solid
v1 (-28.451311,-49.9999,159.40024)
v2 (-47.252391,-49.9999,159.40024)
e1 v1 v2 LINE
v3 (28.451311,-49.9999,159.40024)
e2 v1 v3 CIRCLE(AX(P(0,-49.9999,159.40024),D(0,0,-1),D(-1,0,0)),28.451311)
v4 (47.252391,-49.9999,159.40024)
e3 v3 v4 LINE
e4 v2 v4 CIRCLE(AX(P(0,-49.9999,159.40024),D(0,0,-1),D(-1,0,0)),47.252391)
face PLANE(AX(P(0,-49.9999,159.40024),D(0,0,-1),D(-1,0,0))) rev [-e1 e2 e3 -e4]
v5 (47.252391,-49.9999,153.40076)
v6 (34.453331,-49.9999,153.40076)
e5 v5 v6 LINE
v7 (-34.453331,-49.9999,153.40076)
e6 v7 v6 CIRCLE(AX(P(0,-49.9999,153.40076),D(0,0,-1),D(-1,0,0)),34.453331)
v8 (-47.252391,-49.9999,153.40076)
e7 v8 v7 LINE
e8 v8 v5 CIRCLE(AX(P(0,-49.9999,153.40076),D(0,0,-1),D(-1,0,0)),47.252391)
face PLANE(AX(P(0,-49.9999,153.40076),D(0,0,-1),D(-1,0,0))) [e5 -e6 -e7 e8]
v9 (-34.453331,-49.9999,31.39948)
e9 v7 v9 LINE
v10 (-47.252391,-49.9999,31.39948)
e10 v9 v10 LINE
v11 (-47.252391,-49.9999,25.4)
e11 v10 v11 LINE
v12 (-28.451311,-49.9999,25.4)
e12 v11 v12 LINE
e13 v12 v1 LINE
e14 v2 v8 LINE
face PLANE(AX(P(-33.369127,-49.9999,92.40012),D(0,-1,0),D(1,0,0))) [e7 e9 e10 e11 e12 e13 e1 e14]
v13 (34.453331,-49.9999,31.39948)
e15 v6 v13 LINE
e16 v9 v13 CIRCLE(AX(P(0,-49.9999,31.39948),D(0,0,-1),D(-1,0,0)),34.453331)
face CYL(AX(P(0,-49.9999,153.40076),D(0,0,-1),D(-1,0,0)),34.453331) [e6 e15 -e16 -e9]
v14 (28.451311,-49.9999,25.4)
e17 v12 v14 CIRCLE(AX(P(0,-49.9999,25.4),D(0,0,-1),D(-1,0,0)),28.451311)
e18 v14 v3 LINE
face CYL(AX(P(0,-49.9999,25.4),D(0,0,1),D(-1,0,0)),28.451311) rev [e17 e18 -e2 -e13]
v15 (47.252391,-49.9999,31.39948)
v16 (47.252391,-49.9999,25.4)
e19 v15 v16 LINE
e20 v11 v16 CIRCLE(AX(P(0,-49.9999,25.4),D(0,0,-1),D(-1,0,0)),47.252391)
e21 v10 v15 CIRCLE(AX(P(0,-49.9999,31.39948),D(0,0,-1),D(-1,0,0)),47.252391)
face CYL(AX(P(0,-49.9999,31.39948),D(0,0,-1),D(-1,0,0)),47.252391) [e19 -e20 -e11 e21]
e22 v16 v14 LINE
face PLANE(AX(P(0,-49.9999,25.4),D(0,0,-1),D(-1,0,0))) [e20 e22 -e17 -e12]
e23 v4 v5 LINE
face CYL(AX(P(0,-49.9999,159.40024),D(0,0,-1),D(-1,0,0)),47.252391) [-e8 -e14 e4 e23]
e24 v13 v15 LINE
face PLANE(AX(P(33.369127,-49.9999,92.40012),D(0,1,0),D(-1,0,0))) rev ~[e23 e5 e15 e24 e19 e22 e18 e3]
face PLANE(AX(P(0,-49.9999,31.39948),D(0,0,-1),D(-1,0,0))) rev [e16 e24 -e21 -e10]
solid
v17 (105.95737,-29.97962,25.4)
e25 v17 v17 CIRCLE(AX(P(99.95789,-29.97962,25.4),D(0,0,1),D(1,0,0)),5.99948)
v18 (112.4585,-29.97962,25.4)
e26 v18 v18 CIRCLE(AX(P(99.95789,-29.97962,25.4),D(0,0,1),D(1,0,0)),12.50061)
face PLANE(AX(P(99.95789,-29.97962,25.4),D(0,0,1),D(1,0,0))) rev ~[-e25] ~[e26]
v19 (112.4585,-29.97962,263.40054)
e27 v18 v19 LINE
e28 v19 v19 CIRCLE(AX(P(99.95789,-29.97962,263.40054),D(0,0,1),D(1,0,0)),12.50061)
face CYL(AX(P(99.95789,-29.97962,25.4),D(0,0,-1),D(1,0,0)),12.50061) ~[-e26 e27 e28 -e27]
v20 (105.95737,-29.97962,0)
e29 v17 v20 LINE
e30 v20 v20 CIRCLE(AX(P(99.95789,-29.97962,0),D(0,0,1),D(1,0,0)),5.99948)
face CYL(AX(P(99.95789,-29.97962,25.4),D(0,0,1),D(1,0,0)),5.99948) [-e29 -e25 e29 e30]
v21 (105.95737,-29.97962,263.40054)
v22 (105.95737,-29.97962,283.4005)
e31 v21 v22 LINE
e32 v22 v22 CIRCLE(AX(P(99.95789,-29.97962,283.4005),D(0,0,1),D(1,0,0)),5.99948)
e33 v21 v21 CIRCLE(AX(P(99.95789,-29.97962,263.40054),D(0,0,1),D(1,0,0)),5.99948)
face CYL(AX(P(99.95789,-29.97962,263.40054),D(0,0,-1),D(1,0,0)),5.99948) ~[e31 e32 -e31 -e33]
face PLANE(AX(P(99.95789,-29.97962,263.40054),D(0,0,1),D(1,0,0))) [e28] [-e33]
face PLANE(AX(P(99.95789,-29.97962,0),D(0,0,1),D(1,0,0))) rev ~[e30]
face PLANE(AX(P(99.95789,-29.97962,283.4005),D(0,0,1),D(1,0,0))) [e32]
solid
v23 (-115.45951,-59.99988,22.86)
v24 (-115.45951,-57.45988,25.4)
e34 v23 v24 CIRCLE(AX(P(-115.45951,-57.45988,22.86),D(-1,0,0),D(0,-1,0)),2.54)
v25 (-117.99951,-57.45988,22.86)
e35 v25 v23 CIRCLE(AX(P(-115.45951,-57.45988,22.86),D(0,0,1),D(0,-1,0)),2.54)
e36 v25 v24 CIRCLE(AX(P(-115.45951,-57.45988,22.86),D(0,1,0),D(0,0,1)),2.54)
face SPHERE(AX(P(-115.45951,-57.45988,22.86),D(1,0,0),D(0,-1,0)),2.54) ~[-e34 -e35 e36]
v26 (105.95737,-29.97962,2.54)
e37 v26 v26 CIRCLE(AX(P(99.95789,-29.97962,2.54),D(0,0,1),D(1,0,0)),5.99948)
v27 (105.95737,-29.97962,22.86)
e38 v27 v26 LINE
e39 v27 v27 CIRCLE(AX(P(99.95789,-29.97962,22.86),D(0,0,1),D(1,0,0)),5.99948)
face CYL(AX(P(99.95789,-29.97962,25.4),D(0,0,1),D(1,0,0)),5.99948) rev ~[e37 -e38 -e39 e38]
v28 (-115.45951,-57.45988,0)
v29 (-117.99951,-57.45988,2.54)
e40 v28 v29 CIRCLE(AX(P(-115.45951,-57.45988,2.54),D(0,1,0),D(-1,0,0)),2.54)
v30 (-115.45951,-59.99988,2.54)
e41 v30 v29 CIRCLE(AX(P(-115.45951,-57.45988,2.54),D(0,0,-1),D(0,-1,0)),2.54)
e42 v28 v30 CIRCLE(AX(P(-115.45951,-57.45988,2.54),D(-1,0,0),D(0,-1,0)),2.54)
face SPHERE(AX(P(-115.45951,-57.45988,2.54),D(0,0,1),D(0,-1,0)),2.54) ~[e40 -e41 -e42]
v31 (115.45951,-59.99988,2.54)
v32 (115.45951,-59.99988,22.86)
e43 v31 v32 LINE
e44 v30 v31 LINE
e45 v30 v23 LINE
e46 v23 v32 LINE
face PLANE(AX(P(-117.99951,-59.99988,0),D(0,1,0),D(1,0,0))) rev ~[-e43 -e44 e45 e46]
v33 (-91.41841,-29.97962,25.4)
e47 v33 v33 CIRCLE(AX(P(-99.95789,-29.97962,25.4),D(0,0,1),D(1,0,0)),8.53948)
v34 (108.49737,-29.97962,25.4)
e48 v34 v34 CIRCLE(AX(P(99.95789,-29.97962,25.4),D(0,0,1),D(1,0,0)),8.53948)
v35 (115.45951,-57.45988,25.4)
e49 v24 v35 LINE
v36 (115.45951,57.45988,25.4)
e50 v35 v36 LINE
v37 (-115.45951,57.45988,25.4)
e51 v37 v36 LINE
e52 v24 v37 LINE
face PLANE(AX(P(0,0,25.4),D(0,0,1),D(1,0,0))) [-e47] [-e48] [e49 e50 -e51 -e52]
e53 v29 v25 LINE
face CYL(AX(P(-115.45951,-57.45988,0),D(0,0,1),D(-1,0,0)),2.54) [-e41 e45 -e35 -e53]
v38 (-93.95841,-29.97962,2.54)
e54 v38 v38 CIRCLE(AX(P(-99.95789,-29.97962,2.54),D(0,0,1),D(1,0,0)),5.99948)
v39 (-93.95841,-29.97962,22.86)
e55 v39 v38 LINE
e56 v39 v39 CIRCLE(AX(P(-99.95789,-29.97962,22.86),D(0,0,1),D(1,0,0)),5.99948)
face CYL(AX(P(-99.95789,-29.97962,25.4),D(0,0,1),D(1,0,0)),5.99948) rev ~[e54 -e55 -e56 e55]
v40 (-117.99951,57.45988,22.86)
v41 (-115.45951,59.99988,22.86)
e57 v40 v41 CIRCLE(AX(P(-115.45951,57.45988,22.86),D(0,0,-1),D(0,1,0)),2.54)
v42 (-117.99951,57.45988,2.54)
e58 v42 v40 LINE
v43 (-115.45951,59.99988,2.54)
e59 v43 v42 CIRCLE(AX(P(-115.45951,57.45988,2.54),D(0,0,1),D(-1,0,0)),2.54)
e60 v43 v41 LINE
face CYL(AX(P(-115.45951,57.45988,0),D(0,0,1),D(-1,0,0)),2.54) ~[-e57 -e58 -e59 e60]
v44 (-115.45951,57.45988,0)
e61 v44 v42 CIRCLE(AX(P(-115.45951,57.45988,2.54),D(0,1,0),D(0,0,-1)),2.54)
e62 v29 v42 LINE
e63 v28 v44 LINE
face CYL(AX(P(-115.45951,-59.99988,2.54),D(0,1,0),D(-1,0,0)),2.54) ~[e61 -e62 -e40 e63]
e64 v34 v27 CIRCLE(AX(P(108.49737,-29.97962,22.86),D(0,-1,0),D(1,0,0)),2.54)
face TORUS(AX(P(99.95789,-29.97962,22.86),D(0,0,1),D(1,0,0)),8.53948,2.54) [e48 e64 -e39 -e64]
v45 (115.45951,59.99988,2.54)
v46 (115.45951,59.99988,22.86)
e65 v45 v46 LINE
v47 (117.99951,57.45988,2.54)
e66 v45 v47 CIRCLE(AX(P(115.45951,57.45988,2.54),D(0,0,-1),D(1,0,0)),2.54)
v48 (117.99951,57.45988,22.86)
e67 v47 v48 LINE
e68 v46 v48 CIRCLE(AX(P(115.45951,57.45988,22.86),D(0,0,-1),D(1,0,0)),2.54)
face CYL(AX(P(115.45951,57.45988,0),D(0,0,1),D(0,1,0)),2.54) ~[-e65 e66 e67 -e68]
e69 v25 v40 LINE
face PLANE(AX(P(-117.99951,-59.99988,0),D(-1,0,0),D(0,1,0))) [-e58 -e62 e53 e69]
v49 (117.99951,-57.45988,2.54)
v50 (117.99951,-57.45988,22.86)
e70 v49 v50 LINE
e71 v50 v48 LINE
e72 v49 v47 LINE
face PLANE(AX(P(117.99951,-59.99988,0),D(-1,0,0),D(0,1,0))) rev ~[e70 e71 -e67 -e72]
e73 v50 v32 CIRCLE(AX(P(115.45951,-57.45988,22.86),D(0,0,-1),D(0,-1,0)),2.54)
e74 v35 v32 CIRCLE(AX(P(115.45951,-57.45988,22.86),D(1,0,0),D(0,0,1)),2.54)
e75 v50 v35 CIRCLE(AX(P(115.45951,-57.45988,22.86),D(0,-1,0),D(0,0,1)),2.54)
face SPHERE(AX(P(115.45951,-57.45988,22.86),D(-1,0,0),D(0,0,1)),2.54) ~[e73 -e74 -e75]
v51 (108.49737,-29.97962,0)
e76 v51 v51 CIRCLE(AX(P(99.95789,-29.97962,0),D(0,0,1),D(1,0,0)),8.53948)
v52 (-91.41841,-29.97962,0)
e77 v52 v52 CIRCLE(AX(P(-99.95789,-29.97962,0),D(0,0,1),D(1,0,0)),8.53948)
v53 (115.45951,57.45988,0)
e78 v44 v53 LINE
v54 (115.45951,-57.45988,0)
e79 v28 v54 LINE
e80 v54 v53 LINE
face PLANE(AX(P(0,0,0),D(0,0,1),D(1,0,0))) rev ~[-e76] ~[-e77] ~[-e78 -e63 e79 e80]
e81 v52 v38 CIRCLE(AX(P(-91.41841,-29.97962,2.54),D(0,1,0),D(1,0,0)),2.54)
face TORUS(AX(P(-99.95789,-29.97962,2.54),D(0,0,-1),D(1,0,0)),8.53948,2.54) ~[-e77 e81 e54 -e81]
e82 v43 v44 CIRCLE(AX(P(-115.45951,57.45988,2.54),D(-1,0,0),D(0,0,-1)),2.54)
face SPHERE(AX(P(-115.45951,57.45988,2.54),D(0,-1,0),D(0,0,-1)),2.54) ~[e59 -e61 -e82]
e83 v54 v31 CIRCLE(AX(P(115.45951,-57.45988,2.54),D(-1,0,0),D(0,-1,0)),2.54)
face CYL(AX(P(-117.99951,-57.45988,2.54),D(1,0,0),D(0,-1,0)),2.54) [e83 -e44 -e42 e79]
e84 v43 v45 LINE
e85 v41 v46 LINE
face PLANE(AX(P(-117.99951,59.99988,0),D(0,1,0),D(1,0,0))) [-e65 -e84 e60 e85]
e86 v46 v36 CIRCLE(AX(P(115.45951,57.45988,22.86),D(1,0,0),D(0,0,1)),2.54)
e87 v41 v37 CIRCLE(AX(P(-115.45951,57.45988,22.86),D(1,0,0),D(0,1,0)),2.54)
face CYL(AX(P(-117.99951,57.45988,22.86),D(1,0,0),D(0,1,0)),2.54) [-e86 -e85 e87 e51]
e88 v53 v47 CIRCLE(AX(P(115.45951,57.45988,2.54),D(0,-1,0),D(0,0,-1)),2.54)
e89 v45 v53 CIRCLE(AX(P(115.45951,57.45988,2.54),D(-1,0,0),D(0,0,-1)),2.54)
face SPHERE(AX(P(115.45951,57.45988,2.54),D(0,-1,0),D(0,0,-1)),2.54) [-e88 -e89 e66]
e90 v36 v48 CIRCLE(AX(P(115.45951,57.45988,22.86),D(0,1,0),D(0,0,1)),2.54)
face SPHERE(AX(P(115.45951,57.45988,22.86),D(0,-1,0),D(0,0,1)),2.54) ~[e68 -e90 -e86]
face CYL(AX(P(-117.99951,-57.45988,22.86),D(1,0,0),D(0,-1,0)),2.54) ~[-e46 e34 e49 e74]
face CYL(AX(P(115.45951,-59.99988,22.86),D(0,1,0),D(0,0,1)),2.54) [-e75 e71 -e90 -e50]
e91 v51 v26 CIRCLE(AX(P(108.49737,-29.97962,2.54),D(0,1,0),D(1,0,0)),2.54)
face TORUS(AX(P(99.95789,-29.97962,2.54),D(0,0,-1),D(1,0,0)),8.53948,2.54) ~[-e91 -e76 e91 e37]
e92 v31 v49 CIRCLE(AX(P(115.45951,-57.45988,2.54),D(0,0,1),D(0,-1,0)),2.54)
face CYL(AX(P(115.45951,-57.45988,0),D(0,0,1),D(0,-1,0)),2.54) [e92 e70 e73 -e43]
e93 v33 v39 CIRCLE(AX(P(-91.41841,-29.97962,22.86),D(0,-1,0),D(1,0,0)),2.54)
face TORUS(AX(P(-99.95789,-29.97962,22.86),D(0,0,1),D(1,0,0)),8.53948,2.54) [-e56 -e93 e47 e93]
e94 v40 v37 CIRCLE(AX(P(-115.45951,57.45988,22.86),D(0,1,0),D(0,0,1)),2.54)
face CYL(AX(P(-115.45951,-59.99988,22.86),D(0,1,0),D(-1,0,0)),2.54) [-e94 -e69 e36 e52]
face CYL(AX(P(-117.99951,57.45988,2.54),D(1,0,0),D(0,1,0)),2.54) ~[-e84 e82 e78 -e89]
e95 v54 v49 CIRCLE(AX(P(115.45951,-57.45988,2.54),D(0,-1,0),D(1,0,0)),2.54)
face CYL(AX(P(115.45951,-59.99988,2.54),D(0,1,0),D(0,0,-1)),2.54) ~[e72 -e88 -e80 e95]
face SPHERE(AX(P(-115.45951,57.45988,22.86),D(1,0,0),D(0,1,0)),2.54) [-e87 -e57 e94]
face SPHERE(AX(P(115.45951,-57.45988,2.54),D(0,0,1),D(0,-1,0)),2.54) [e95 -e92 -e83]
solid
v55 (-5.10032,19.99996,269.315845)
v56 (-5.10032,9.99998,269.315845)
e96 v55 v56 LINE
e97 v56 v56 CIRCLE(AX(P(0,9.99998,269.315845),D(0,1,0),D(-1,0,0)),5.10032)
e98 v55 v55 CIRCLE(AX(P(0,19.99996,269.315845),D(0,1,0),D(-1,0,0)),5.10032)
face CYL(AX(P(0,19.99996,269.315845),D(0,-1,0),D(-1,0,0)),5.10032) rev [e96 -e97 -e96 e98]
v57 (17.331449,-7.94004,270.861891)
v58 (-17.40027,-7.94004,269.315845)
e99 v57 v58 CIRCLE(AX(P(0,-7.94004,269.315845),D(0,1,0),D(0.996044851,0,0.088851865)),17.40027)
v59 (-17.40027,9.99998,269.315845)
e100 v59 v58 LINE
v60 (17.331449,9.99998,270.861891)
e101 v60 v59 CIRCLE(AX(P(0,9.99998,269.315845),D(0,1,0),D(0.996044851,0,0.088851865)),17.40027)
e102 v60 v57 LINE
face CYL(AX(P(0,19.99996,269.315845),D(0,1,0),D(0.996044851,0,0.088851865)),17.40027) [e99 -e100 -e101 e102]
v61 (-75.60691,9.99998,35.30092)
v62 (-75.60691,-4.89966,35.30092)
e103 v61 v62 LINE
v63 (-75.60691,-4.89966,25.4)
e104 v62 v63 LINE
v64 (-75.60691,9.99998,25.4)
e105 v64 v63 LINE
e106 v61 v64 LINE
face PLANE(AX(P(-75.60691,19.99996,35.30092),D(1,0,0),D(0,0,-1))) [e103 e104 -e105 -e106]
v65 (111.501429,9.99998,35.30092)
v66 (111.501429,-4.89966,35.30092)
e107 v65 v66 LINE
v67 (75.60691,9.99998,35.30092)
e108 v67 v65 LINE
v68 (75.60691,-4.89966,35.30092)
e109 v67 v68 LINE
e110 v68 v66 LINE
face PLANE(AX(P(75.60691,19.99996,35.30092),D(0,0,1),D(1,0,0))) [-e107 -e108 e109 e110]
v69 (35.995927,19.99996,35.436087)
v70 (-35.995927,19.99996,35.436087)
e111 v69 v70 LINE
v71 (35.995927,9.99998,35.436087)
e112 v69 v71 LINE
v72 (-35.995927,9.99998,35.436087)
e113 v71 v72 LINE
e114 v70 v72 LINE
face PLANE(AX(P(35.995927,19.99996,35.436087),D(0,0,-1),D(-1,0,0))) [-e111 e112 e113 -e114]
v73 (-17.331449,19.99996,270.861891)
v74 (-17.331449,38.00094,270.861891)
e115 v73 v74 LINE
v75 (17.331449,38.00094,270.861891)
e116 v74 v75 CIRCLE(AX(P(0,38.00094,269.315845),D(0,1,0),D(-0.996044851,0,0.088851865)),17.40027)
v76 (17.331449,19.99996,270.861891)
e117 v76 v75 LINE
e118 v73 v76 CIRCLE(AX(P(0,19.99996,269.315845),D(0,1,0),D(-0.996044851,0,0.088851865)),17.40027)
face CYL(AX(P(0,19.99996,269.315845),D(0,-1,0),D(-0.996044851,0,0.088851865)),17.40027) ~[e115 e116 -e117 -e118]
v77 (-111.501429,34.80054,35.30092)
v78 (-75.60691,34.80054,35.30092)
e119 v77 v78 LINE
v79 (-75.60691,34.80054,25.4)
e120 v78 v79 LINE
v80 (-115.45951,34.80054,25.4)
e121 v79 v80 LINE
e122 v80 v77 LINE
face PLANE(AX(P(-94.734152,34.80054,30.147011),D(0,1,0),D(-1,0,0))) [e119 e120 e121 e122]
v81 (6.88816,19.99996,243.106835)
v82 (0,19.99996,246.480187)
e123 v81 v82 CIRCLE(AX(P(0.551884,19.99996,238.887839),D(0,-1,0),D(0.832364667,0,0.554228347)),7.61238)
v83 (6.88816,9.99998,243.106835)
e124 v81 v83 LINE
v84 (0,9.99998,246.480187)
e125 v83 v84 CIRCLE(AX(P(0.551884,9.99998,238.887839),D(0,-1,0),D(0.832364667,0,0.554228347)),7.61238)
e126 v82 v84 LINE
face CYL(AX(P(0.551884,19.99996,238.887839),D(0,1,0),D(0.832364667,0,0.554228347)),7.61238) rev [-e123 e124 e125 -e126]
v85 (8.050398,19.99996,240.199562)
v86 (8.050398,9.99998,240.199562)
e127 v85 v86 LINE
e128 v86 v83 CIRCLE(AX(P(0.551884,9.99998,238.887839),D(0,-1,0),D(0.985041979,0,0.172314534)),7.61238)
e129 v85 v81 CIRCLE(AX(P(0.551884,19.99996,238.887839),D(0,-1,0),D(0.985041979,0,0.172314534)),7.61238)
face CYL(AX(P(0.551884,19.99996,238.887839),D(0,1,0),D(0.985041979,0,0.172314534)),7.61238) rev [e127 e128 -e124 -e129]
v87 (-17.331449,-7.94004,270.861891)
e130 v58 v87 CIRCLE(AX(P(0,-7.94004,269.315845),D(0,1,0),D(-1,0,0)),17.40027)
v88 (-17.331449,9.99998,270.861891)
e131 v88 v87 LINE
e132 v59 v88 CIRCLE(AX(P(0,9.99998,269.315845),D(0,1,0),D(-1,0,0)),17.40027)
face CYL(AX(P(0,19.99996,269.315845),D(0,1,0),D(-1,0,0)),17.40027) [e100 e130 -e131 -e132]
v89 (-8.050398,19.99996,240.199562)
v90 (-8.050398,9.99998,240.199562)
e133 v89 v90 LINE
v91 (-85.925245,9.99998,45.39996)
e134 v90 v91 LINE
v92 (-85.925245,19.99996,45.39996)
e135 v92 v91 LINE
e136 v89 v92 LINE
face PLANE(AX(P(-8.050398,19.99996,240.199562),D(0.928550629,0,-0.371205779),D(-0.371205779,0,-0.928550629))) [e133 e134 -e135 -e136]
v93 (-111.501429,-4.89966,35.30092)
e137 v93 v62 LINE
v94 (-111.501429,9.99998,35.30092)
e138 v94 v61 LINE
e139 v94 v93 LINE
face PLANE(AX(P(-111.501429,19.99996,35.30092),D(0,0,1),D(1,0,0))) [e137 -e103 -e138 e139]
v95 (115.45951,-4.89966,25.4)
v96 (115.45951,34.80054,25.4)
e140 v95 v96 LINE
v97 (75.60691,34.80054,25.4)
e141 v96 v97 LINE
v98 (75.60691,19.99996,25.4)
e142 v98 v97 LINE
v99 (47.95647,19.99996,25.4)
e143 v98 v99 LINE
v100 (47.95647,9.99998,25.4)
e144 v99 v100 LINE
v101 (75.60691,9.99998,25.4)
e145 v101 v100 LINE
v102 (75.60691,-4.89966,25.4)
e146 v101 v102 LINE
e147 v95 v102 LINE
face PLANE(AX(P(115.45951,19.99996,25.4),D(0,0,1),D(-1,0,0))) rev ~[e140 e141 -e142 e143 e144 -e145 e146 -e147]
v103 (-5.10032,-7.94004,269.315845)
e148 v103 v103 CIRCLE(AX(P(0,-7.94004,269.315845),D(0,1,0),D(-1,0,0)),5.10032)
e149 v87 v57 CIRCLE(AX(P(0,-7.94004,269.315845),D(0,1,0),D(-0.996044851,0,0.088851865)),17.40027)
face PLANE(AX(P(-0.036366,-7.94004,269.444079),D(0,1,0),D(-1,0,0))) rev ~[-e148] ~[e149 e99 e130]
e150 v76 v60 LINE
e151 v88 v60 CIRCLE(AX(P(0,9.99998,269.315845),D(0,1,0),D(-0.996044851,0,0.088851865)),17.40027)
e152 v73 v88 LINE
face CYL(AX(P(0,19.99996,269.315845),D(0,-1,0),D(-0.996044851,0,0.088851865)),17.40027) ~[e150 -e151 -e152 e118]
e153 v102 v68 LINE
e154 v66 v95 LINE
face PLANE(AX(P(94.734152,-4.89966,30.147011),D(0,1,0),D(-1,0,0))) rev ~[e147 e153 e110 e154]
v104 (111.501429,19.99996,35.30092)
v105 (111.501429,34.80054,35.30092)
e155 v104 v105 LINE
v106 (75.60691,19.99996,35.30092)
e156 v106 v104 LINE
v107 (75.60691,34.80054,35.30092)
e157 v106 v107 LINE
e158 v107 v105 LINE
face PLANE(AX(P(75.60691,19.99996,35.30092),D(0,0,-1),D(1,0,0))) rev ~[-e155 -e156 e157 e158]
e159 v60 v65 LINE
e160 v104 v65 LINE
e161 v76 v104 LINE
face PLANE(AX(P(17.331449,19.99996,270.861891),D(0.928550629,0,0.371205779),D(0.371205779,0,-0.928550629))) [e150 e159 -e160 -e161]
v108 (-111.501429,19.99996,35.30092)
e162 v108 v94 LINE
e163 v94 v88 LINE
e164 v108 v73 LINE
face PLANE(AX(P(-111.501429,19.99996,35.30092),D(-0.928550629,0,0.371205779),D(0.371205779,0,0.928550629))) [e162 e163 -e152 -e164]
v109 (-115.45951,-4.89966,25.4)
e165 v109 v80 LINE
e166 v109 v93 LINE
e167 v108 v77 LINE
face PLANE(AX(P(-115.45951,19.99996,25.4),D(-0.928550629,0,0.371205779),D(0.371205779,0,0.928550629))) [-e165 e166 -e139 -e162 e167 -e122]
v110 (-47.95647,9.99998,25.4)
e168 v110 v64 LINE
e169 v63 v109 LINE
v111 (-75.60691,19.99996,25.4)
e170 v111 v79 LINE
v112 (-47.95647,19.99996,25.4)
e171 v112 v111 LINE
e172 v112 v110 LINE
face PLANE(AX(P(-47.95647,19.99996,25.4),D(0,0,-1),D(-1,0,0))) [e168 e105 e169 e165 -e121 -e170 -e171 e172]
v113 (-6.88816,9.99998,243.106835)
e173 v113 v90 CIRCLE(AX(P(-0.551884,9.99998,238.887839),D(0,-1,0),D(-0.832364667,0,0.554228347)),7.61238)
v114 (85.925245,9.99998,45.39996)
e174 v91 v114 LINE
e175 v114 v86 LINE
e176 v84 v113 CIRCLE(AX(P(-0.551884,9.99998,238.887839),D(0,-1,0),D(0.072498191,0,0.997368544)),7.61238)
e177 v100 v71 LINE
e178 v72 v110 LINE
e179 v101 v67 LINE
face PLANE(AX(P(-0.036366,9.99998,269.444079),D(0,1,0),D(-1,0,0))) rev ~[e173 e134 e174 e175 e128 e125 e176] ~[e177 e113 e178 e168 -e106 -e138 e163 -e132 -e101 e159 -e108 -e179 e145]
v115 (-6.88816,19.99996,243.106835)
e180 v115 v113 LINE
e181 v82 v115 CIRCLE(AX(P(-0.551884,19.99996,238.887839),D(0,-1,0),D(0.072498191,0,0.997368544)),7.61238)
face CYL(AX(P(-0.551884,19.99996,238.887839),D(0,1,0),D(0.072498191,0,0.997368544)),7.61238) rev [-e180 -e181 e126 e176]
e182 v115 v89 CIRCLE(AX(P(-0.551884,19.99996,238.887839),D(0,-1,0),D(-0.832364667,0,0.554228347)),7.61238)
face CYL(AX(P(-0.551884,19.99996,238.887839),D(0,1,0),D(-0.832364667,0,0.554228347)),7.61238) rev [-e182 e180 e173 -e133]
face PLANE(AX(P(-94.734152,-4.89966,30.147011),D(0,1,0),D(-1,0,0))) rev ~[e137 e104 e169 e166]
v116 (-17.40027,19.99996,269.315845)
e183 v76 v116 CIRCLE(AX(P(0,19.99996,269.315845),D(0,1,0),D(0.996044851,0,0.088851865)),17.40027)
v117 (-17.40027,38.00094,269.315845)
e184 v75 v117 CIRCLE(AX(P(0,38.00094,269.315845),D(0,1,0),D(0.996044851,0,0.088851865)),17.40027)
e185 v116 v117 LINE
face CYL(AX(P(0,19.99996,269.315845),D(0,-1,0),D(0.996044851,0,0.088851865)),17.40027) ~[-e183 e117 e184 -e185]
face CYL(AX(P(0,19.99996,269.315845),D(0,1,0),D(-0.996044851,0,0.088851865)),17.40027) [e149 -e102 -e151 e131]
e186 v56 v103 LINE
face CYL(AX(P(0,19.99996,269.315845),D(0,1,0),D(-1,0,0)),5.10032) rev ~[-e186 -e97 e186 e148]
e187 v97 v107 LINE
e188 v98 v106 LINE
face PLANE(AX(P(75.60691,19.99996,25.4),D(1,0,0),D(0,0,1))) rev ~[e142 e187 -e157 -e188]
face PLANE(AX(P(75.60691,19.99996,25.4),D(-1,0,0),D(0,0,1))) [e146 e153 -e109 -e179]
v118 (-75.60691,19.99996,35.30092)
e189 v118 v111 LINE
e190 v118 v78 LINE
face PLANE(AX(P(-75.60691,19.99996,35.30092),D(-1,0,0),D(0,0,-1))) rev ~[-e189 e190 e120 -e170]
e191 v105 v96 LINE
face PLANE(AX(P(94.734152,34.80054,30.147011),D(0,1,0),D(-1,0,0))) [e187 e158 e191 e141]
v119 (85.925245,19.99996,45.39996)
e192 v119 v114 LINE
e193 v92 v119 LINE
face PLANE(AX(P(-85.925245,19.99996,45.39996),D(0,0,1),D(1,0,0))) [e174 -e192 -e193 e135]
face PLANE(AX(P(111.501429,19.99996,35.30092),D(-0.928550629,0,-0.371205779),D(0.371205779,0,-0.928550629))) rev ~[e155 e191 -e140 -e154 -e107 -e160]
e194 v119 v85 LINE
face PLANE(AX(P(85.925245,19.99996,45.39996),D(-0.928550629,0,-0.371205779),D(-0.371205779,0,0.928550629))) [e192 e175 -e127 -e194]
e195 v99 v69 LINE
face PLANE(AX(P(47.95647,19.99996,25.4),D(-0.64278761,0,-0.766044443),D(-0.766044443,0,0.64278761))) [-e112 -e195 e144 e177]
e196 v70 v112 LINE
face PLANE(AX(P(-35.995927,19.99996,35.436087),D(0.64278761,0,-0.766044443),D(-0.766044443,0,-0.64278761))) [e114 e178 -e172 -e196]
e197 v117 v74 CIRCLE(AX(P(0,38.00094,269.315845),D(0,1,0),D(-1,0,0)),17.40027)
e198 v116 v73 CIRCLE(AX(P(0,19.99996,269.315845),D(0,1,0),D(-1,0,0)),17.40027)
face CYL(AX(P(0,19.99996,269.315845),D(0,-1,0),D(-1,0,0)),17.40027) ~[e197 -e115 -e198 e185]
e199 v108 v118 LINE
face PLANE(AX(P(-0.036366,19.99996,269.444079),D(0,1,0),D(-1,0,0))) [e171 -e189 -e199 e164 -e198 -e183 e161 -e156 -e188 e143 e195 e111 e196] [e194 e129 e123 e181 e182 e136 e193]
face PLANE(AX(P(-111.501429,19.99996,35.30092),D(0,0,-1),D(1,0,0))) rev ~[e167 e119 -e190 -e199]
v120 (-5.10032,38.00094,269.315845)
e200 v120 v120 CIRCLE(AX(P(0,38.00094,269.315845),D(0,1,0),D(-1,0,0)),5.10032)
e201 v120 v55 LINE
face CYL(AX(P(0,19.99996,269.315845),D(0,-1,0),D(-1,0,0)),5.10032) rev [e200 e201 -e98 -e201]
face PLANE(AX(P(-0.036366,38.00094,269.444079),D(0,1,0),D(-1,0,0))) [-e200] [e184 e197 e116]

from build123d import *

# Parameters (mm, degrees)
F0_W      = 235.99902
F0_H      = 119.99976
F1_DEPTH  = 25.4
F2_R      = 5.99948
F3_DEPTH  = 40.386
F4_R      = 2.54
F6_R      = 5.10032
F7_DEPTH  = 9.99998
F8_DEPTH  = 14.80058
F9_DEPTH  = 24.89962
F10_DEPTH = 18.00098
F11_DEPTH = 27.94
F12_R     = 12.50061
F12_R_2   = 5.99948
F13_DEPTH = 238.00054
F14_DEPTH = 25.4
F15_R     = 5.99948
F16_DEPTH = 19.99996
F19_ANGLE = 180


# Not quite as in the source:
# - a feature names something its author has since deleted; it is built from what else it names


with BuildPart() as f1:
    # F0 (on Top) → F1 (new body)
    with BuildSketch(Plane.XY):
        Rectangle(F0_W, F0_H)
    extrude(amount=F1_DEPTH)

    # F2 (on face) → F3 (cut)
    with BuildSketch(Plane.XY.offset(25.4)):
        with Locations((-99.95789, -29.97962)):
            Circle(F2_R)
        with Locations((99.95789, -29.97962)):
            Circle(F2_R)
    extrude(amount=-F3_DEPTH, mode=Mode.SUBTRACT)

    # F4
    f4_edges = [f1.edges().sort_by_distance(p)[0] for p in [
        (0, -59.99988, 25.4),
        (117.99951, 0, 25.4),
        (0, 59.99988, 25.4),
        (-117.99951, -59.99988, 12.7),
        (117.99951, -59.99988, 12.7),
        (0, -59.99988, 0),
        (-117.99951, 0, 0),
        (117.99951, 0, 0),
        (0, 59.99988, 0),
        (-105.95737, -29.97962, 0),
        (93.95841, -29.97962, 0),
        (-117.99951, 59.99988, 12.7),
        (-117.99951, 0, 25.4),
        (117.99951, 59.99988, 12.7),
        (93.95841, -29.97962, 25.4),
        (105.95737, -29.97962, 12.7),
        (-105.95737, -29.97962, 25.4),
        (-93.95841, -29.97962, 12.7),
    ]]
    fillet(f4_edges, radius=F4_R)


with BuildPart() as f7:
    # F6 (on offset) → F7 (new body)
    with BuildSketch(Plane(origin=(0, 19.99996, 0), x_dir=(-1, 0, 0), z_dir=(0, 1, 0))):
        with BuildLine():
            ThreePointArc((17.3314493474, 270.8618911485), (0, 286.7161147099), (-17.3314493474, 270.8618911485))
            ThreePointArc((-17.3314493474, 270.8618911485), (-0.7737887103, 251.9327883875), (17.40027, 269.3158447099))
            ThreePointArc((17.40027, 269.3158447099), (17.3830563223, 270.0896334201), (17.3314493474, 270.8618911485))
        make_face()
        with Locations((0, 269.3158447099)):
            Circle(F6_R, mode=Mode.SUBTRACT)
        Polygon((-111.5014288749, 35.30092), (-115.45951, 25.4), (-75.60691, 25.4), (-75.60691, 35.30092), align=None)
        with BuildLine():
            Line((-75.60691, 35.30092), (-75.60691, 25.4))
            Line((-75.60691, 25.4), (-47.95647, 25.4))
            Line((-47.95647, 25.4), (-35.9959270127, 35.4360872093))
            Line((-35.9959270127, 35.4360872093), (0, 35.4360872093))
            Line((0, 35.4360872093), (35.9959270127, 35.4360872093))
            Line((35.9959270127, 35.4360872093), (47.95647, 25.4))
            Line((47.95647, 25.4), (75.60691, 25.4))
            Line((75.60691, 25.4), (75.60691, 35.30092))
            Line((75.60691, 35.30092), (111.5014288749, 35.30092))
            Line((111.5014288749, 35.30092), (17.3314493474, 270.8618911485))
            ThreePointArc((17.3314493474, 270.8618911485), (17.3830563223, 270.0896334201), (17.40027, 269.3158447099))
            ThreePointArc((17.40027, 269.3158447099), (-0.7737887103, 251.9327883875), (-17.3314493474, 270.8618911485))
            Line((-17.3314493474, 270.8618911485), (-111.5014288749, 35.30092))
            Line((-111.5014288749, 35.30092), (-75.60691, 35.30092))
        make_face()
        with BuildLine():
            Line((85.9252445798, 45.39996), (0, 45.39996))
            Line((0, 45.39996), (-85.9252445798, 45.39996))
            Line((-85.9252445798, 45.39996), (-8.0503976449, 240.1995624219))
            ThreePointArc((-8.0503976449, 240.1995624219), (-7.620364016, 241.7135981516), (-6.8881599273, 243.1068354916))
            ThreePointArc((-6.8881599273, 243.1068354916), (-3.8999689002, 245.7244062159), (0, 246.480187063))
            ThreePointArc((0, 246.480187063), (3.8999689002, 245.7244062159), (6.8881599273, 243.1068354916))
            ThreePointArc((6.8881599273, 243.1068354916), (7.620364016, 241.7135981516), (8.0503976449, 240.1995624219))
            Line((8.0503976449, 240.1995624219), (85.9252445798, 45.39996))
        make_face(mode=Mode.SUBTRACT)
        Polygon((115.45951, 25.4), (111.5014288749, 35.30092), (75.60691, 35.30092), (75.60691, 25.4), align=None)
    extrude(amount=-F7_DEPTH)

    # F6 (on offset) → F8 (join)
    with BuildSketch(Plane(origin=(0, 19.99996, 0), x_dir=(-1, 0, 0), z_dir=(0, 1, 0))):
        Polygon((-111.5014288749, 35.30092), (-115.45951, 25.4), (-75.60691, 25.4), (-75.60691, 35.30092), align=None)
        Polygon((115.45951, 25.4), (111.5014288749, 35.30092), (75.60691, 35.30092), (75.60691, 25.4), align=None)
    extrude(amount=F8_DEPTH)

    # F6 (on offset) → F9 (join)
    with BuildSketch(Plane(origin=(0, 19.99996, 0), x_dir=(-1, 0, 0), z_dir=(0, 1, 0))):
        Polygon((-111.5014288749, 35.30092), (-115.45951, 25.4), (-75.60691, 25.4), (-75.60691, 35.30092), align=None)
        Polygon((115.45951, 25.4), (111.5014288749, 35.30092), (75.60691, 35.30092), (75.60691, 25.4), align=None)
    extrude(amount=-F9_DEPTH)

    # F6 (on offset) → F10 (join)
    with BuildSketch(Plane(origin=(0, 19.99996, 0), x_dir=(-1, 0, 0), z_dir=(0, 1, 0))):
        with BuildLine():
            ThreePointArc((17.3314493474, 270.8618911485), (0, 286.7161147099), (-17.3314493474, 270.8618911485))
            ThreePointArc((-17.3314493474, 270.8618911485), (-0.7737887103, 251.9327883875), (17.40027, 269.3158447099))
            ThreePointArc((17.40027, 269.3158447099), (17.3830563223, 270.0896334201), (17.3314493474, 270.8618911485))
        make_face()
        with Locations((0, 269.3158447099)):
            Circle(F6_R, mode=Mode.SUBTRACT)
    extrude(amount=F10_DEPTH)

    # F6 (on offset) → F11 (join)
    with BuildSketch(Plane(origin=(0, 19.99996, 0), x_dir=(-1, 0, 0), z_dir=(0, 1, 0))):
        with BuildLine():
            ThreePointArc((17.3314493474, 270.8618911485), (0, 286.7161147099), (-17.3314493474, 270.8618911485))
            ThreePointArc((-17.3314493474, 270.8618911485), (-0.7737887103, 251.9327883875), (17.40027, 269.3158447099))
            ThreePointArc((17.40027, 269.3158447099), (17.3830563223, 270.0896334201), (17.3314493474, 270.8618911485))
        make_face()
        with Locations((0, 269.3158447099)):
            Circle(F6_R, mode=Mode.SUBTRACT)
    extrude(amount=-F11_DEPTH)


with BuildPart() as f13:
    # F12 (on face) → F13 (new body)
    with BuildSketch(Plane.XY.offset(25.4)):
        with Locations((99.95789, -29.97962)):
            Circle(F12_R)
        with Locations((99.95789, -29.97962)):
            Circle(F12_R_2, mode=Mode.SUBTRACT)
        with Locations((99.95789, -29.97962)):
            Circle(F12_R_2)
    extrude(amount=F13_DEPTH)

    # F12 (on face) → F14 (join, through all)
    with BuildSketch(Plane.XY.offset(25.4)):
        with Locations((99.95789, -29.97962)):
            Circle(F12_R_2)
    extrude(amount=-F14_DEPTH)

    # F15 (on face) → F16 (join)
    with BuildSketch(Plane.XY.offset(263.40054)):
        with Locations((99.95789, -29.97962)):
            Circle(F15_R)
    extrude(amount=F16_DEPTH)


with BuildPart() as f19:
    # F18 (on offset) → F19 (revolve)
    with BuildSketch(Plane.XZ.offset(49.9999)):
        Polygon((-47.2523905337, 31.39948), (-47.2523905337, 25.4), (-28.4513105337, 25.4), (-28.4513105337, 159.40024), (-47.2523905337, 159.40024), (-47.2523905337, 153.40076), (-34.4533305337, 153.40076), (-34.4533305337, 31.39948), align=None)
    revolve(axis=Axis((0, -49.9999, -8.691214025), (0, 0, -1)), revolution_arc=F19_ANGLE)


solid = Compound([f1.part, f7.part, f13.part, f19.part])
